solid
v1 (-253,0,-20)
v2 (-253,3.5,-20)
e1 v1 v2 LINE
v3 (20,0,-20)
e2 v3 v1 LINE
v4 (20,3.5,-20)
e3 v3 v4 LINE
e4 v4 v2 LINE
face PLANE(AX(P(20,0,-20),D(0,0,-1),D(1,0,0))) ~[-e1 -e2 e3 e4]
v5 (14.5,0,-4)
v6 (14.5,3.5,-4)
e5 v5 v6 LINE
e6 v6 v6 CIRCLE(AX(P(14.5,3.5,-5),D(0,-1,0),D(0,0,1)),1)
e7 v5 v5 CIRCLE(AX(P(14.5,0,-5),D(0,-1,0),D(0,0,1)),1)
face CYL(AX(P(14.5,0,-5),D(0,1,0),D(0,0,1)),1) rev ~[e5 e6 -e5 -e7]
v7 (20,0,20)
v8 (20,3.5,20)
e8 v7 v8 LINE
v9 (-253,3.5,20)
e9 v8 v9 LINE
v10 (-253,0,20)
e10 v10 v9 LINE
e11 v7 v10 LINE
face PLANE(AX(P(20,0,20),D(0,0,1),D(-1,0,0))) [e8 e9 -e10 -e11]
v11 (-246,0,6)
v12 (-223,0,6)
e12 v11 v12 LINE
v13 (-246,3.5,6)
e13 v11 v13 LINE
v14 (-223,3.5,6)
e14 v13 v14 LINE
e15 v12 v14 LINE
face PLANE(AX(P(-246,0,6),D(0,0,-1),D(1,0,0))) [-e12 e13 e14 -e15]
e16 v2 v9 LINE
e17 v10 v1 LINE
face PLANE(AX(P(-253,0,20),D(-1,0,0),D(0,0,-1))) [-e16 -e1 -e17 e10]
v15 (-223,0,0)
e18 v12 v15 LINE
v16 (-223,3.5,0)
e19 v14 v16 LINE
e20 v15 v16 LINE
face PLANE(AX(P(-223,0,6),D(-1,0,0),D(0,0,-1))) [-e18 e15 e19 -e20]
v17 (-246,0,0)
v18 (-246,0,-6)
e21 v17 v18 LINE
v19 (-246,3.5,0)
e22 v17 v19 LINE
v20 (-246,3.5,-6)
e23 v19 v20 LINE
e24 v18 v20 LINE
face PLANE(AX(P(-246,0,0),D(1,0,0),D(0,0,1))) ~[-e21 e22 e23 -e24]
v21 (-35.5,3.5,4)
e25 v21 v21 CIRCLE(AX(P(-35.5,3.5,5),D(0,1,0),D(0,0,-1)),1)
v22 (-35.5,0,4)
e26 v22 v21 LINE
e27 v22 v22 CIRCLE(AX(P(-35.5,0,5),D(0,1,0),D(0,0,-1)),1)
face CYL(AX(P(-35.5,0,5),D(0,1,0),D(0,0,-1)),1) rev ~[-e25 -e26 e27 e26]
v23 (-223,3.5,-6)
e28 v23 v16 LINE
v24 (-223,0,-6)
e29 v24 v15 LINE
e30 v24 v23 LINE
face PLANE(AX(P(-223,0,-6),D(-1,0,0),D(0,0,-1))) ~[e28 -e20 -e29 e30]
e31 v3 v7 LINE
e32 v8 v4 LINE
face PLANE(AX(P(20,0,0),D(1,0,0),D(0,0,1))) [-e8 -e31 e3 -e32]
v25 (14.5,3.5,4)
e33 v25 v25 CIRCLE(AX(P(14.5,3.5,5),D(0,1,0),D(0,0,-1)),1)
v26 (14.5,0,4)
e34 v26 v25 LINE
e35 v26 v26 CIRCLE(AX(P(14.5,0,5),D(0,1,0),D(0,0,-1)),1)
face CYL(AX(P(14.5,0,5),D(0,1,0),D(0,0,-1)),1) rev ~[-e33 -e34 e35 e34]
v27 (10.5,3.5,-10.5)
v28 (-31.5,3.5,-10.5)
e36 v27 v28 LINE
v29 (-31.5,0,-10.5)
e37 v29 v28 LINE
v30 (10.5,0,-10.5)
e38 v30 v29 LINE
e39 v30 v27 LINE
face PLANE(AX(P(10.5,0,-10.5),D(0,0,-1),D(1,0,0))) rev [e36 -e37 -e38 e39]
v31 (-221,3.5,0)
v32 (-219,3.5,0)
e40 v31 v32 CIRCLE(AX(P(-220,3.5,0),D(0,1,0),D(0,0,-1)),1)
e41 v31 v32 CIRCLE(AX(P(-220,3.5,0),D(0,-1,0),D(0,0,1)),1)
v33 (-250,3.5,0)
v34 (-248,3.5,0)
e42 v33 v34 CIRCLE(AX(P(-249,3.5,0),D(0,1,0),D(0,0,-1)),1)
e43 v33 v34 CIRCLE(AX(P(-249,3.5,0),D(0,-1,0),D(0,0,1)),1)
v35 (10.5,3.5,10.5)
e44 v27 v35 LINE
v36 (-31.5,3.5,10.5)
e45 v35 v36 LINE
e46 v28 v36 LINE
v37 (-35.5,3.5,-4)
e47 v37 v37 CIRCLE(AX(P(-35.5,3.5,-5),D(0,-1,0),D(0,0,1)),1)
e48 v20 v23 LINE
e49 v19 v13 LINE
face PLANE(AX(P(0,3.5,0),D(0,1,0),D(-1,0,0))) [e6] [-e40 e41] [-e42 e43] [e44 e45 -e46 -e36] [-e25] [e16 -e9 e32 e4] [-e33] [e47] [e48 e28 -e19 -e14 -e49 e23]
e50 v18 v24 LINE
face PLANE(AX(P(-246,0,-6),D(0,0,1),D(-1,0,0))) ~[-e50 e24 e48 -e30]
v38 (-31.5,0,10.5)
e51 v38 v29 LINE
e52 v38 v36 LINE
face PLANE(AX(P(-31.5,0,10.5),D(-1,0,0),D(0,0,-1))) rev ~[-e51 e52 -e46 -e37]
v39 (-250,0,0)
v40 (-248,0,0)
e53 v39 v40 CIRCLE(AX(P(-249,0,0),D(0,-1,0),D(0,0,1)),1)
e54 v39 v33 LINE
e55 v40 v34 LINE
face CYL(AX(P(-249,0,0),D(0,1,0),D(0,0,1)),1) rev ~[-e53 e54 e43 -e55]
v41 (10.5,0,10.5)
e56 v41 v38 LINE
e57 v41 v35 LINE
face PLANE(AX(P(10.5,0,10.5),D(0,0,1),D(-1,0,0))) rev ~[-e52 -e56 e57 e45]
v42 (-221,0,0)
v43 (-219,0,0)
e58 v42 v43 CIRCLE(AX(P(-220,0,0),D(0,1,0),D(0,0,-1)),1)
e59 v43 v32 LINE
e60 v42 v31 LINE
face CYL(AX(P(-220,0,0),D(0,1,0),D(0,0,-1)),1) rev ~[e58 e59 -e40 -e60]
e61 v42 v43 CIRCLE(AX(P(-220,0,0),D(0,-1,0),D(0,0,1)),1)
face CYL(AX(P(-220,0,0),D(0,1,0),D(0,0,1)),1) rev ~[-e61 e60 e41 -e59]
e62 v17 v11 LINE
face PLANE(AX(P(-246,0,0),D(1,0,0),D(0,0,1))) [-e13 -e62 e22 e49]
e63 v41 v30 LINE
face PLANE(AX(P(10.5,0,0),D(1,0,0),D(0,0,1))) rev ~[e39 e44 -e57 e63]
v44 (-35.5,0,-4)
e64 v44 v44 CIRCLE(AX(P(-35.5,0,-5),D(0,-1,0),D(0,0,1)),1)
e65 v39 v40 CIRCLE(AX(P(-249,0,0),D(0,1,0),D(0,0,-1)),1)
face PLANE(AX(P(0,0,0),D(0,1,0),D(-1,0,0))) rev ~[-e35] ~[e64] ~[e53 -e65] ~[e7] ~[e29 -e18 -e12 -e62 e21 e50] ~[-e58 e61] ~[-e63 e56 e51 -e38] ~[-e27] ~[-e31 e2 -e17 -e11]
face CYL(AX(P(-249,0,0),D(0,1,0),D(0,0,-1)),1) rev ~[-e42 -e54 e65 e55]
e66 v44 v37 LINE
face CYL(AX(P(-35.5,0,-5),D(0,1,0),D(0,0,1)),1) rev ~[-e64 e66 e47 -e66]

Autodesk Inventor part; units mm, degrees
ref_plane "YZ Plane" through (0, 0, 0) normal (1, 0, 0) x (0, 1, 0)
ref_plane "XZ Plane" through (0, 0, 0) normal (0, 1, 0) x (-1, 0, 0)
ref_plane "XY Plane" through (0, 0, 0) normal (0, 0, 1) x (1, 0, 0)
sketch "Sketch1" plane through (0, 0, 0) normal (0, 1, 0) x (-1, 0, 0)
  line L0 (0, 0) -> (31.5, 0)
  line L1 (223, -6) -> (246, -6)
  line L2 (246, -6) -> (246, 6)
  line L3 (246, 6) -> (223, 6)
  line L4 (223, 6) -> (223, -6)
  line L5 (223, -6) -> (246, 6) construction
  line L6 (246, -6) -> (223, 6) construction
  line L7 (234.5, 0) -> (249, 0) construction
  line L8 (234.5, 0) -> (220, 0) construction
  line L9 (0, 0) -> (18.5, 0) construction
  line L10 (223, 0) -> (240, 0) construction
  line L11 (0, 0) -> (-10.5, 0)
  line L12 (-20, 0) -> (-20, 20)
  line L13 (-20, 20) -> (253, 20)
  line L14 (253, 20) -> (253, 0)
  line L15 (253, 0) -> (240, 0) construction
  line L16 (253, 0) -> (246, 0)
  line L17 (-10.5, 10.5) -> (31.5, 10.5)
  line L18 (31.5, 10.5) -> (31.5, -10.5)
  line L19 (31.5, -10.5) -> (-10.5, -10.5)
  line L20 (-10.5, -10.5) -> (-10.5, 10.5)
  line L21 (-10.5, 10.5) -> (31.5, -10.5) construction
  line L22 (31.5, 10.5) -> (-10.5, -10.5) construction
  line L23 (-14.5, 5) -> (35.5, 5) construction
  line L24 (35.5, 5) -> (35.5, -5) construction
  line L25 (35.5, -5) -> (-14.5, -5) construction
  line L26 (-14.5, -5) -> (-14.5, 5) construction
  line L27 (-14.5, 5) -> (35.5, -5) construction
  line L28 (35.5, 5) -> (-14.5, -5) construction
  line L29 (31.5, 0) -> (223, 0)
  line L30 (-10.5, 0) -> (-20, 0)
  line L31 (-20, 0) -> (0, 0) construction
  point P0 (10.5, 0)
  point P1 (10.5, 0)
  dimension "d21" = 240
  dimension "d22" = 23
  dimension "d23" = 12
  dimension "d24" = 6
  dimension "d25" = 14.5
  dimension "d26" = 14.5
  dimension "d28" = 18.5
  dimension "d37" = 20
  dimension "d38" = 20
  dimension "d39" = 42
  dimension "d40" = 21
  dimension "d41" = 50
  dimension "d42" = 10
  dimension "d43" = 10.5
  dimension "d52" = 7
extrude "Extrusion1" add sketch "Sketch1" along normal blind 3.5 contours L18 L17 L20 L30 L12 L13 L14 L16 L2 L3 L4 L29
hole "Hole3" at (0, 0, 0) at (-249, 0, 0) at (-220, 0, 0) at (14.5, 0, 5) at (-35.5, 0, 5) direction (0, 1, 0) diameter 2 end through all
fillet "Fillet1" [suppressed]
mirror "Mirror1" about plane through (-31.5, 0, 0) normal (0, 0, -1)
properties part number "segment2a" material "Plywood, Finish"
